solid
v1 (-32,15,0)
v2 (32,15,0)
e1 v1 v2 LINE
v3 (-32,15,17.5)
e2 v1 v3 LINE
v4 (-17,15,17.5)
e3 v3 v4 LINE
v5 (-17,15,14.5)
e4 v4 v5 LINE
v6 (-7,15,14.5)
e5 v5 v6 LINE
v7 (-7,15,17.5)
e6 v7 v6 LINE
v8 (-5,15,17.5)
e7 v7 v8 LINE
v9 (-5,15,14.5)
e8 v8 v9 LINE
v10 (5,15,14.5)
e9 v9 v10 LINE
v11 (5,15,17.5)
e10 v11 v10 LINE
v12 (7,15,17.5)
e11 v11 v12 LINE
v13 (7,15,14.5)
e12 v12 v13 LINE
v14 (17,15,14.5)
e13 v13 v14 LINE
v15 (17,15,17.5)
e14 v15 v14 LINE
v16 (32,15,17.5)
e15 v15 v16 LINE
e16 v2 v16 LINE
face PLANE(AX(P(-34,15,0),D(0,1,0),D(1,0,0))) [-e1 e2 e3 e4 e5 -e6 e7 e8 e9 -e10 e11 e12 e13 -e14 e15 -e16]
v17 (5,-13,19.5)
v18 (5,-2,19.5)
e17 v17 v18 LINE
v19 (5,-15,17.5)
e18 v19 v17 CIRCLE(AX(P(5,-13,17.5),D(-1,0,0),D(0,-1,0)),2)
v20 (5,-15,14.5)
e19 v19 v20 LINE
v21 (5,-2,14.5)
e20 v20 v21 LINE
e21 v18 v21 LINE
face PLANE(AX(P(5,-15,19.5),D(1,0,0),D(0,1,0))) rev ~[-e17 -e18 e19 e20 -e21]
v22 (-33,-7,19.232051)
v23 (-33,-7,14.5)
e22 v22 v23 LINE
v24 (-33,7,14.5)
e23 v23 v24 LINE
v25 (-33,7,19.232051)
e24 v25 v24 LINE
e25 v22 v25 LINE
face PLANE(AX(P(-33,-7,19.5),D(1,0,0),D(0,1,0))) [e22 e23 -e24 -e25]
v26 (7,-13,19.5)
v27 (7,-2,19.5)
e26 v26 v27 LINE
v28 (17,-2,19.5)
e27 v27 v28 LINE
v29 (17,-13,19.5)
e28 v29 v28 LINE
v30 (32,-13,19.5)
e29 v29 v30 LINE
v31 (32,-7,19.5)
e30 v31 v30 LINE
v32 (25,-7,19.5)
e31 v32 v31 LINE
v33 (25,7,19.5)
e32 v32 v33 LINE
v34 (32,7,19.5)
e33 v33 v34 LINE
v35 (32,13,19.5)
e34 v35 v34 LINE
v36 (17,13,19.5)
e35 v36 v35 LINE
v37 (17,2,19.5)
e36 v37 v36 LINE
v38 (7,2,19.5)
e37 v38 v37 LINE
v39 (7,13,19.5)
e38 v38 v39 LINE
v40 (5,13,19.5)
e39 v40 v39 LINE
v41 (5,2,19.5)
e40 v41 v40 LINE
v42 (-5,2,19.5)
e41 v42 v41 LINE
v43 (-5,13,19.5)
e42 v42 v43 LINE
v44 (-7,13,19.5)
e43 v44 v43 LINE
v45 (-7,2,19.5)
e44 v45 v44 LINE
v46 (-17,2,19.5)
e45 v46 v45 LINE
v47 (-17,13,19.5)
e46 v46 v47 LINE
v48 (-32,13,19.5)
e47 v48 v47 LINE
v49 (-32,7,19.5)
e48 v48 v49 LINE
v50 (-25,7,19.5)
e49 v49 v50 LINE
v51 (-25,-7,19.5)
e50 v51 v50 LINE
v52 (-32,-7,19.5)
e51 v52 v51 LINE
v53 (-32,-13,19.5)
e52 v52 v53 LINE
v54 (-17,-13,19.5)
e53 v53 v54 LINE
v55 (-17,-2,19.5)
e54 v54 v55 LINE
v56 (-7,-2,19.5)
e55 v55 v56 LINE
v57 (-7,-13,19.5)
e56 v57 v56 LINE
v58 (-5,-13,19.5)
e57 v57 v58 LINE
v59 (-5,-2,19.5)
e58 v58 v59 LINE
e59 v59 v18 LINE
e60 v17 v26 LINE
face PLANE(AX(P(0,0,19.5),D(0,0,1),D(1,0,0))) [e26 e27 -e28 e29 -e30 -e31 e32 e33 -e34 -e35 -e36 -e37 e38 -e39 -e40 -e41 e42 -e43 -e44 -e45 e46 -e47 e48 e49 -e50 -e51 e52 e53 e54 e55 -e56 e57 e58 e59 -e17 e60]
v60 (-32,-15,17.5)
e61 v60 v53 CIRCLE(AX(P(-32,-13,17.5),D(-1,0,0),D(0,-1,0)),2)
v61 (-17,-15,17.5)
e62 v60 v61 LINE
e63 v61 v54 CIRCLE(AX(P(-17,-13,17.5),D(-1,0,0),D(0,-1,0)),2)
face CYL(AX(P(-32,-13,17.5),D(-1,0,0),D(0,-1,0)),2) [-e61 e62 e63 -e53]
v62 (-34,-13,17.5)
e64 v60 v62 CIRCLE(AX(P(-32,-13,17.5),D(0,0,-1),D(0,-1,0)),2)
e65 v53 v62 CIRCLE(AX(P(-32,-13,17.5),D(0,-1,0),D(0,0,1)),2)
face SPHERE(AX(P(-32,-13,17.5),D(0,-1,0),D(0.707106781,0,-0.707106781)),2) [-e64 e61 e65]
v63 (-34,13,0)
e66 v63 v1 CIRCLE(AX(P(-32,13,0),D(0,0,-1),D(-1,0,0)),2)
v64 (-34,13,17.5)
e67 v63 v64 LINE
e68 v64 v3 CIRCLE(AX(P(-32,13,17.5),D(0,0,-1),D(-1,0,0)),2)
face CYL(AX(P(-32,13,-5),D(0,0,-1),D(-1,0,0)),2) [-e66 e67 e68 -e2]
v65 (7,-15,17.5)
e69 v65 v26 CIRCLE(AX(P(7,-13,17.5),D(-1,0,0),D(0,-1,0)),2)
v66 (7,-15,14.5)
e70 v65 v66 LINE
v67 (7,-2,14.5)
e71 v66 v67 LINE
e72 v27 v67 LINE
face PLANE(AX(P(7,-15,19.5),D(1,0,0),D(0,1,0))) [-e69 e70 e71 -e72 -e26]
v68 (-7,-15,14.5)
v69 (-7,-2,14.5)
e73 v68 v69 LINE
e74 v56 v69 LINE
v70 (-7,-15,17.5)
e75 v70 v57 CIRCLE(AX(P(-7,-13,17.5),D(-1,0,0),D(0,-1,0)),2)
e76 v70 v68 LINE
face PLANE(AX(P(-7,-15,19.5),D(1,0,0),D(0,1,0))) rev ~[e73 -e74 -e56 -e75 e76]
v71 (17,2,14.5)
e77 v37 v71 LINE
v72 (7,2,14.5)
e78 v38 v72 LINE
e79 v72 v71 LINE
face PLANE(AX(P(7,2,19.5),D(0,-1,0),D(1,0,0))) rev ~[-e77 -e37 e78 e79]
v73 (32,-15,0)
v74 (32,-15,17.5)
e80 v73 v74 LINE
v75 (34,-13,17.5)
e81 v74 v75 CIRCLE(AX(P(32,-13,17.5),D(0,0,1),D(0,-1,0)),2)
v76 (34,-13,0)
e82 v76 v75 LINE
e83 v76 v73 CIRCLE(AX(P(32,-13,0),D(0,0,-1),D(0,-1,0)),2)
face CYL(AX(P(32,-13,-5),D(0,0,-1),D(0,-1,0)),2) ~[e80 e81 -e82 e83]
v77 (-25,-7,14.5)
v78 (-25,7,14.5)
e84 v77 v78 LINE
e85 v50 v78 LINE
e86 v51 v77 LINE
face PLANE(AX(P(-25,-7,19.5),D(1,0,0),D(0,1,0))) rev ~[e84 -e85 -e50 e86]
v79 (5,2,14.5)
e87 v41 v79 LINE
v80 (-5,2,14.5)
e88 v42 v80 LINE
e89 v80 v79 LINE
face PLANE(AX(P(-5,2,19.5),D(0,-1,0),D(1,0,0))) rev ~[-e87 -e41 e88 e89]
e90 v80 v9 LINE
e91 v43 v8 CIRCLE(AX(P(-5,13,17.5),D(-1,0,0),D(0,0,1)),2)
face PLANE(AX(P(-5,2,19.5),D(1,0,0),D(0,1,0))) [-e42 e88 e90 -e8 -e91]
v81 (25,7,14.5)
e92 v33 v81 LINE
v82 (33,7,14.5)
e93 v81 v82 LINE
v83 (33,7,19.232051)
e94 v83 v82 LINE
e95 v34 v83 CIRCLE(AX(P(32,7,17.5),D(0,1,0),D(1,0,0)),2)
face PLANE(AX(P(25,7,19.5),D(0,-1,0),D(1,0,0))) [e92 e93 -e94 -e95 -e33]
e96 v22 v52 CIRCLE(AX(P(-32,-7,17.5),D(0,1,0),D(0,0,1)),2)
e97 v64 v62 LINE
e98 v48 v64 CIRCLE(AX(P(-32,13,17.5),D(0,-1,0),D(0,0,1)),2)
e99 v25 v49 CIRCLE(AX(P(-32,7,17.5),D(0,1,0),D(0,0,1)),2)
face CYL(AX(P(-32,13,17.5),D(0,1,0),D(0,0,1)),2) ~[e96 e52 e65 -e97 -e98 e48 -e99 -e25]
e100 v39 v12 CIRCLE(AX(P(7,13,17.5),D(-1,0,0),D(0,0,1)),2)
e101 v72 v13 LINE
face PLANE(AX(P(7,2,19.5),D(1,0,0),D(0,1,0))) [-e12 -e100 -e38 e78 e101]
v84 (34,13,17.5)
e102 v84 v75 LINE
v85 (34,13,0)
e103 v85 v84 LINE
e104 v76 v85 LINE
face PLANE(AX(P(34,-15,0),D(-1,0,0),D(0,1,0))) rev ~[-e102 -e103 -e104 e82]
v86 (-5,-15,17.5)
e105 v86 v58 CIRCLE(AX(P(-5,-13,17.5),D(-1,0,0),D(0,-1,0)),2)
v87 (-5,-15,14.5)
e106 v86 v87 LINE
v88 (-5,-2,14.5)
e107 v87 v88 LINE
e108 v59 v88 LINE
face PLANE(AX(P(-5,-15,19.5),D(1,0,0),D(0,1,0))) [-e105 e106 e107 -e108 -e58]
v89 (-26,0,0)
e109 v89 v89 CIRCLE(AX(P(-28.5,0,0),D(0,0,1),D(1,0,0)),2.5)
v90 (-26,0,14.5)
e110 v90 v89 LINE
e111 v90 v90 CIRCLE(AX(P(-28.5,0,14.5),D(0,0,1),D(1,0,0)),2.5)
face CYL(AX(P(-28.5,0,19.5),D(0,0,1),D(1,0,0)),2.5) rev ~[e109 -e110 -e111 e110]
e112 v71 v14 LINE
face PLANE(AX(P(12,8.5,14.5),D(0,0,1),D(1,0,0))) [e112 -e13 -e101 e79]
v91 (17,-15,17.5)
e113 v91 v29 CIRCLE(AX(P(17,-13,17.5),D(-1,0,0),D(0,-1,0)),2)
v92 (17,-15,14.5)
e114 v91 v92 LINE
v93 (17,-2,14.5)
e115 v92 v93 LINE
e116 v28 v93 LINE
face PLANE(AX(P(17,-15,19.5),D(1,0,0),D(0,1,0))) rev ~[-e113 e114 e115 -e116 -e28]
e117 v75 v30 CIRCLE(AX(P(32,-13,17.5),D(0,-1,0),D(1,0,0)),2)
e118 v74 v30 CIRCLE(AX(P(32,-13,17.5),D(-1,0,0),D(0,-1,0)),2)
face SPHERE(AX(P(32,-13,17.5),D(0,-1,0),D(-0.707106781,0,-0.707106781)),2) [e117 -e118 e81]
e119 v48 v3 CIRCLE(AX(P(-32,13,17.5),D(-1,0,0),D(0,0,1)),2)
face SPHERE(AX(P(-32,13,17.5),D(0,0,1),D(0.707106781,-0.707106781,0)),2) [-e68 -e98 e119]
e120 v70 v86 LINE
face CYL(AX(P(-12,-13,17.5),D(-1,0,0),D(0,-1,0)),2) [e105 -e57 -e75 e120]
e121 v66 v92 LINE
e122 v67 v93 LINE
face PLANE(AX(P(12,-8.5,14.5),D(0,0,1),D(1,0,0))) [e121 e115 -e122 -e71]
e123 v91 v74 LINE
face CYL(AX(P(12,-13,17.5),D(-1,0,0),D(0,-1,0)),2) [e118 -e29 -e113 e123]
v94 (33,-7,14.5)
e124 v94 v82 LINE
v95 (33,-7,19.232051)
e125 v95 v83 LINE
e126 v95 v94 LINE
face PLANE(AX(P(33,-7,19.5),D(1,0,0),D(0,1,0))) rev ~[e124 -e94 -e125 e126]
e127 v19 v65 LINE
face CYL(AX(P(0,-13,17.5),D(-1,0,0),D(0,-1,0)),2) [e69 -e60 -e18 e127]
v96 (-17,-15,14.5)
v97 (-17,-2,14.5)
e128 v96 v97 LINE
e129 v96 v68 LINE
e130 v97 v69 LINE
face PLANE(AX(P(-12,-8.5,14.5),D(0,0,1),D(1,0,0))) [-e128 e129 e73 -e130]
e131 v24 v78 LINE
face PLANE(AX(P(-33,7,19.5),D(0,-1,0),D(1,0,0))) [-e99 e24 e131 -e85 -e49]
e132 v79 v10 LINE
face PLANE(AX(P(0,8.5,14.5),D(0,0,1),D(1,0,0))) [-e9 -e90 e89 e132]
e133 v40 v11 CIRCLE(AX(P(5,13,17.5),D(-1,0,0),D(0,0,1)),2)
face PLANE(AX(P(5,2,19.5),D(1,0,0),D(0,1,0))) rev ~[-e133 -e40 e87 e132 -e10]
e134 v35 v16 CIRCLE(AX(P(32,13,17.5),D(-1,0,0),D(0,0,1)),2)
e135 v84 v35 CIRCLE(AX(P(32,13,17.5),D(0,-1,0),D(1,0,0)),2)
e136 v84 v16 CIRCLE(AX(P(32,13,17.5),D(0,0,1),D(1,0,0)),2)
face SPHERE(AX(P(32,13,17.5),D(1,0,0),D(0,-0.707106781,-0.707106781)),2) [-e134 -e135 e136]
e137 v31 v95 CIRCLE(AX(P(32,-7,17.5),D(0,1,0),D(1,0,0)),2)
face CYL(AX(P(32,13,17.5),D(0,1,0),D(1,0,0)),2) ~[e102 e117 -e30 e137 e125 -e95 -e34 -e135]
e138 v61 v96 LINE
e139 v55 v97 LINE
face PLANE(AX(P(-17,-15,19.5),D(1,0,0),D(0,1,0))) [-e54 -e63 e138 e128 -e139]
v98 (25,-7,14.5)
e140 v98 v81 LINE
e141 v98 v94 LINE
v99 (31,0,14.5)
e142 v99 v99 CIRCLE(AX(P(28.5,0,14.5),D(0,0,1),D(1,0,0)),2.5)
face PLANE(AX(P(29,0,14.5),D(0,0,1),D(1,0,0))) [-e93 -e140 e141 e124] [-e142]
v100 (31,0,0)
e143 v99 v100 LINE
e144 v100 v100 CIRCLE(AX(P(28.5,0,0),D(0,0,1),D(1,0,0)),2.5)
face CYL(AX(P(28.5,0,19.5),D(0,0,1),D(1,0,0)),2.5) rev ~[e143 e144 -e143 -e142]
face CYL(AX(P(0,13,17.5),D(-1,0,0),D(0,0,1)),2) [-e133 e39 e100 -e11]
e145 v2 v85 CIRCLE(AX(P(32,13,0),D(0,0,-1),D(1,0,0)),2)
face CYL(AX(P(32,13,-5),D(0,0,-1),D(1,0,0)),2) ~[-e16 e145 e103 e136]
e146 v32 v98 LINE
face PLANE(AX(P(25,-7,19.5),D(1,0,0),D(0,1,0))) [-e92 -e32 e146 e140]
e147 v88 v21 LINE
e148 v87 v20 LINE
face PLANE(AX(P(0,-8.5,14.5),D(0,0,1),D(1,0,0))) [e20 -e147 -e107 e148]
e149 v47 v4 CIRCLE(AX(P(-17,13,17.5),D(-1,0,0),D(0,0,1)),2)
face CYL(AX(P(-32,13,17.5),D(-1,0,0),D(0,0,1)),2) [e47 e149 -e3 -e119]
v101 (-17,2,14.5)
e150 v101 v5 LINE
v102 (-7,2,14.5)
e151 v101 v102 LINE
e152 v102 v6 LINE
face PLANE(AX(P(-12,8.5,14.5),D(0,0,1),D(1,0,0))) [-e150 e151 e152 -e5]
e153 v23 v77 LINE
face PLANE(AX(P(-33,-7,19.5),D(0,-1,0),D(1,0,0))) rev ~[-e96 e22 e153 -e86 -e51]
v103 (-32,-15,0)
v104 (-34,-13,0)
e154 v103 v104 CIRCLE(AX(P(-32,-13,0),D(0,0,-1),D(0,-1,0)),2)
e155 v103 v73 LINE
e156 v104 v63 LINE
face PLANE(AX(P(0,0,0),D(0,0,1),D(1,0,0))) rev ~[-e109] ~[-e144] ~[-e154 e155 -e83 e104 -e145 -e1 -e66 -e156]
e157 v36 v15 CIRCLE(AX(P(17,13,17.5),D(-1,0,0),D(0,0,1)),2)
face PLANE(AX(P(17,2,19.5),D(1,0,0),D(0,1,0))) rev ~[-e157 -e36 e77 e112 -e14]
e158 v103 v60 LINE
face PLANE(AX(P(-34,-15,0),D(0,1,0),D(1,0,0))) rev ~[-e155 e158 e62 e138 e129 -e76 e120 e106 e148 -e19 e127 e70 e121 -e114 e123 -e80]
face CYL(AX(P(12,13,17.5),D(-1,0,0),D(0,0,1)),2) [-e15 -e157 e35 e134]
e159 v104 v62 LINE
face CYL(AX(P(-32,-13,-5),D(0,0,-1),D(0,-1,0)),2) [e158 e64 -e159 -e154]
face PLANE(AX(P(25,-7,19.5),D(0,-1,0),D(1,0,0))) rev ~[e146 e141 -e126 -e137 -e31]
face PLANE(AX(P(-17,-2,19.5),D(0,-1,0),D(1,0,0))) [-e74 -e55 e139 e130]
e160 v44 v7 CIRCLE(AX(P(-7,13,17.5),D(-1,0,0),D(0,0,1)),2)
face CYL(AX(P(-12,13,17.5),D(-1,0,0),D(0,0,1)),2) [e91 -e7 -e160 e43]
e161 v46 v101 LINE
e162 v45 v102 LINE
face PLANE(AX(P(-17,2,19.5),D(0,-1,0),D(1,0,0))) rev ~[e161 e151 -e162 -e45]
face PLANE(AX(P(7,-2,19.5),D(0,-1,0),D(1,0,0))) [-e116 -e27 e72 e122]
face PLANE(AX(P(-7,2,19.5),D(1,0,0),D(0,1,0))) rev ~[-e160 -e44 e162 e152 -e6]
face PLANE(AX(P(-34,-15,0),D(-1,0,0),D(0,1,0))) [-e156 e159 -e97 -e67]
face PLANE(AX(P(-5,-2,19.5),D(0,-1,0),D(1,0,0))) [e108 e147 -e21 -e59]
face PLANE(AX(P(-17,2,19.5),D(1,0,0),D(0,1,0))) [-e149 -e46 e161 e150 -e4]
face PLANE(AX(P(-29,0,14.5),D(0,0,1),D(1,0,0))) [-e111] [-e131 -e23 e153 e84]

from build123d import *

# Parameters (mm, degrees)
F0_W         = 68
F0_H         = 30
F1_DEPTH     = 19.5
F2_R         = 2.5
F3_DEPTH     = 19.5
F4_W         = 10
F4_H         = 13
F4_W_2       = 8
F4_H_2       = 14
F5_DEPTH     = 5
F6_T1_DEPTH  = 20
F6_T3_DEPTH  = 26
F6_T5_DEPTH  = 20
F6_T7_DEPTH  = 12
F6_T9_DEPTH  = 12
F6_T11_DEPTH = 22.5
F6_S15_W     = 2
F6_S15_H     = 2
F6_T16_DEPTH = 2
F6_S21_W     = 2
F6_S21_H     = 2
F6_T22_DEPTH = 2
F6_S27_W     = 2
F6_S27_H     = 2
F6_T28_DEPTH = 2
F6_S33_W     = 2
F6_S33_H     = 2
F6_T34_DEPTH = 2


# Not quite as in the source:
# - a fillet or chamfer that OpenCascade refuses, or shapes differently, is made with other operations: its cross-section is extruded or revolved along the edge and cut away or added


with BuildPart() as f1:
    # F0 (on Top) → F1 (new body)
    with BuildSketch(Plane.XY):
        Rectangle(F0_W, F0_H)
    extrude(amount=F1_DEPTH)

    # F2 (on face) → F3 (cut, through all)
    with BuildSketch(Plane.XY.offset(19.5)):
        with Locations((-28.5, 0)):
            Circle(F2_R)
        with Locations((28.5, 0)):
            Circle(F2_R)
    extrude(amount=-F3_DEPTH, mode=Mode.SUBTRACT)

    # F4 (on face) → F5 (cut)
    with BuildSketch(Plane.XY.offset(19.5)):
        with Locations((0, 8.5)):
            Rectangle(F4_W, F4_H)
        with Locations((12, 8.5)):
            Rectangle(F4_W, F4_H)
        with Locations((-12, 8.5)):
            Rectangle(F4_W, F4_H)
        with Locations((-12, -8.5)):
            Rectangle(F4_W, F4_H)
        with Locations((0, -8.5)):
            Rectangle(F4_W, F4_H)
        with Locations((12, -8.5)):
            Rectangle(F4_W, F4_H)
        with Locations((29, 0)):
            Rectangle(F4_W_2, F4_H_2)
        with Locations((-29, 0)):
            Rectangle(F4_W_2, F4_H_2)
    extrude(amount=-F5_DEPTH, mode=Mode.SUBTRACT)

    # F6: fillet of radius 2 on 14 edges, made by hand

    # F6_s2 → F6_t1 (cut)
    with BuildSketch(Plane.YZ.offset(-32)):
        with BuildLine():
            ThreePointArc((-15, 17.5), (-14.4142135624, 18.9142135624), (-13, 19.5))
            Line((-13, 19.5), (-15, 19.5))
            Line((-15, 19.5), (-15, 17.5))
        make_face()
        with BuildLine():
            ThreePointArc((13, 19.5), (14.4142135624, 18.9142135624), (15, 17.5))
            Line((15, 17.5), (15, 19.5))
            Line((15, 19.5), (13, 19.5))
        make_face()
    extrude(amount=F6_T1_DEPTH, mode=Mode.SUBTRACT)

    # F6_s4 → F6_t3 (cut)
    with BuildSketch(Plane.XZ.offset(-13)):
        with BuildLine():
            ThreePointArc((-32, 19.5), (-33.4142135624, 18.9142135624), (-34, 17.5))
            Line((-34, 17.5), (-34, 19.5))
            Line((-34, 19.5), (-32, 19.5))
        make_face()
        with BuildLine():
            ThreePointArc((34, 17.5), (33.4142135624, 18.9142135624), (32, 19.5))
            Line((32, 19.5), (34, 19.5))
            Line((34, 19.5), (34, 17.5))
        make_face()
    extrude(amount=F6_T3_DEPTH, mode=Mode.SUBTRACT)

    # F6_s6 → F6_t5 (cut)
    with BuildSketch(Plane.YZ.offset(12)):
        with BuildLine():
            ThreePointArc((-15, 17.5), (-14.4142135624, 18.9142135624), (-13, 19.5))
            Line((-13, 19.5), (-15, 19.5))
            Line((-15, 19.5), (-15, 17.5))
        make_face()
        with BuildLine():
            ThreePointArc((13, 19.5), (14.4142135624, 18.9142135624), (15, 17.5))
            Line((15, 17.5), (15, 19.5))
            Line((15, 19.5), (13, 19.5))
        make_face()
    extrude(amount=F6_T5_DEPTH, mode=Mode.SUBTRACT)

    # F6_s8 → F6_t7 (cut)
    with BuildSketch(Plane.YZ):
        with BuildLine():
            ThreePointArc((-15, 17.5), (-14.4142135624, 18.9142135624), (-13, 19.5))
            Line((-13, 19.5), (-15, 19.5))
            Line((-15, 19.5), (-15, 17.5))
        make_face()
        with BuildLine():
            ThreePointArc((13, 19.5), (14.4142135624, 18.9142135624), (15, 17.5))
            Line((15, 17.5), (15, 19.5))
            Line((15, 19.5), (13, 19.5))
        make_face()
    extrude(amount=F6_T7_DEPTH, mode=Mode.SUBTRACT)

    # F6_s10 → F6_t9 (cut)
    with BuildSketch(Plane.YZ.offset(-12)):
        with BuildLine():
            ThreePointArc((-15, 17.5), (-14.4142135624, 18.9142135624), (-13, 19.5))
            Line((-13, 19.5), (-15, 19.5))
            Line((-15, 19.5), (-15, 17.5))
        make_face()
        with BuildLine():
            ThreePointArc((13, 19.5), (14.4142135624, 18.9142135624), (15, 17.5))
            Line((15, 17.5), (15, 19.5))
            Line((15, 19.5), (13, 19.5))
        make_face()
    extrude(amount=F6_T9_DEPTH, mode=Mode.SUBTRACT)

    # F6_s12 → F6_t11 (cut)
    with BuildSketch(Plane.XY.offset(-5)):
        with BuildLine():
            ThreePointArc((-32, -15), (-33.4142135624, -14.4142135624), (-34, -13))
            Line((-34, -13), (-34, -15))
            Line((-34, -15), (-32, -15))
        make_face()
        with BuildLine():
            ThreePointArc((-34, 13), (-33.4142135624, 14.4142135624), (-32, 15))
            Line((-32, 15), (-34, 15))
            Line((-34, 15), (-34, 13))
        make_face()
        with BuildLine():
            ThreePointArc((34, 13), (33.4142135624, 14.4142135624), (32, 15))
            Line((32, 15), (34, 15))
            Line((34, 15), (34, 13))
        make_face()
        with BuildLine():
            ThreePointArc((32, -15), (33.4142135624, -14.4142135624), (34, -13))
            Line((34, -13), (34, -15))
            Line((34, -15), (32, -15))
        make_face()
    extrude(amount=F6_T11_DEPTH, mode=Mode.SUBTRACT)


with BuildPart() as f6_tool14:
    # F6_s15 → F6_t16 (new body)
    with BuildSketch(Plane.XZ.offset(13)):
        with Locations((-33, 18.5)):
            Rectangle(F6_S15_W, F6_S15_H)
    extrude(amount=F6_T16_DEPTH)

    # F6_s17 → F6_t18 (revolve, cut)
    with BuildSketch(Plane(origin=(-32, -13, 17.5), x_dir=(0.7071067812, 0, -0.7071067812), z_dir=(-0.7071067812, 0, -0.7071067812))):
        with BuildLine():
            ThreePointArc((0, -2), (2, 0), (0, 2))
            Line((0, 2), (0, -2))
        make_face()
    revolve(axis=Axis((-32, -13, 17.5), (0, -1, 0)), mode=Mode.SUBTRACT)


with BuildPart() as f1_1:
    add(f1.part)

    # F6_t13: cut F6_tool14
    add(f6_tool14.part, mode=Mode.SUBTRACT)


with BuildPart() as f6_tool20:
    # F6_s21 → F6_t22 (new body)
    with BuildSketch(Plane.XY.offset(17.5)):
        with Locations((-33, 14)):
            Rectangle(F6_S21_W, F6_S21_H)
    extrude(amount=F6_T22_DEPTH)

    # F6_s23 → F6_t24 (revolve, cut)
    with BuildSketch(Plane(origin=(-32, 13, 17.5), x_dir=(0.7071067812, -0.7071067812, 0), z_dir=(-0.7071067812, -0.7071067812, 0))):
        with BuildLine():
            ThreePointArc((0, -2), (2, 0), (0, 2))
            Line((0, 2), (0, -2))
        make_face()
    revolve(axis=Axis((-32, 13, 17.5), (0, 0, 1)), mode=Mode.SUBTRACT)


with BuildPart() as f1_2:
    add(f1_1.part)

    # F6_t19: cut F6_tool20
    add(f6_tool20.part, mode=Mode.SUBTRACT)


with BuildPart() as f6_tool26:
    # F6_s27 → F6_t28 (new body)
    with BuildSketch(Plane.XZ.offset(13)):
        with Locations((33, 18.5)):
            Rectangle(F6_S27_W, F6_S27_H)
    extrude(amount=F6_T28_DEPTH)

    # F6_s29 → F6_t30 (revolve, cut)
    with BuildSketch(Plane(origin=(32, -13, 17.5), x_dir=(-0.7071067812, 0, -0.7071067812), z_dir=(-0.7071067812, 0, 0.7071067812))):
        with BuildLine():
            ThreePointArc((0, -2), (2, 0), (0, 2))
            Line((0, 2), (0, -2))
        make_face()
    revolve(axis=Axis((32, -13, 17.5), (0, -1, 0)), mode=Mode.SUBTRACT)


with BuildPart() as f1_3:
    add(f1_2.part)

    # F6_t25: cut F6_tool26
    add(f6_tool26.part, mode=Mode.SUBTRACT)


with BuildPart() as f6_tool32:
    # F6_s33 → F6_t34 (new body)
    with BuildSketch(Plane.YZ.offset(32)):
        with Locations((14, 18.5)):
            Rectangle(F6_S33_W, F6_S33_H)
    extrude(amount=F6_T34_DEPTH)

    # F6_s35 → F6_t36 (revolve, cut)
    with BuildSketch(Plane(origin=(32, 13, 17.5), x_dir=(0, -0.7071067812, -0.7071067812), z_dir=(0, -0.7071067812, 0.7071067812))):
        with BuildLine():
            ThreePointArc((0, -2), (2, 0), (0, 2))
            Line((0, 2), (0, -2))
        make_face()
    revolve(axis=Axis((32, 13, 17.5), (1, 0, 0)), mode=Mode.SUBTRACT)


with BuildPart() as f1_4:
    add(f1_3.part)

    # F6_t31: cut F6_tool32
    add(f6_tool32.part, mode=Mode.SUBTRACT)


solid = f1_4.part
